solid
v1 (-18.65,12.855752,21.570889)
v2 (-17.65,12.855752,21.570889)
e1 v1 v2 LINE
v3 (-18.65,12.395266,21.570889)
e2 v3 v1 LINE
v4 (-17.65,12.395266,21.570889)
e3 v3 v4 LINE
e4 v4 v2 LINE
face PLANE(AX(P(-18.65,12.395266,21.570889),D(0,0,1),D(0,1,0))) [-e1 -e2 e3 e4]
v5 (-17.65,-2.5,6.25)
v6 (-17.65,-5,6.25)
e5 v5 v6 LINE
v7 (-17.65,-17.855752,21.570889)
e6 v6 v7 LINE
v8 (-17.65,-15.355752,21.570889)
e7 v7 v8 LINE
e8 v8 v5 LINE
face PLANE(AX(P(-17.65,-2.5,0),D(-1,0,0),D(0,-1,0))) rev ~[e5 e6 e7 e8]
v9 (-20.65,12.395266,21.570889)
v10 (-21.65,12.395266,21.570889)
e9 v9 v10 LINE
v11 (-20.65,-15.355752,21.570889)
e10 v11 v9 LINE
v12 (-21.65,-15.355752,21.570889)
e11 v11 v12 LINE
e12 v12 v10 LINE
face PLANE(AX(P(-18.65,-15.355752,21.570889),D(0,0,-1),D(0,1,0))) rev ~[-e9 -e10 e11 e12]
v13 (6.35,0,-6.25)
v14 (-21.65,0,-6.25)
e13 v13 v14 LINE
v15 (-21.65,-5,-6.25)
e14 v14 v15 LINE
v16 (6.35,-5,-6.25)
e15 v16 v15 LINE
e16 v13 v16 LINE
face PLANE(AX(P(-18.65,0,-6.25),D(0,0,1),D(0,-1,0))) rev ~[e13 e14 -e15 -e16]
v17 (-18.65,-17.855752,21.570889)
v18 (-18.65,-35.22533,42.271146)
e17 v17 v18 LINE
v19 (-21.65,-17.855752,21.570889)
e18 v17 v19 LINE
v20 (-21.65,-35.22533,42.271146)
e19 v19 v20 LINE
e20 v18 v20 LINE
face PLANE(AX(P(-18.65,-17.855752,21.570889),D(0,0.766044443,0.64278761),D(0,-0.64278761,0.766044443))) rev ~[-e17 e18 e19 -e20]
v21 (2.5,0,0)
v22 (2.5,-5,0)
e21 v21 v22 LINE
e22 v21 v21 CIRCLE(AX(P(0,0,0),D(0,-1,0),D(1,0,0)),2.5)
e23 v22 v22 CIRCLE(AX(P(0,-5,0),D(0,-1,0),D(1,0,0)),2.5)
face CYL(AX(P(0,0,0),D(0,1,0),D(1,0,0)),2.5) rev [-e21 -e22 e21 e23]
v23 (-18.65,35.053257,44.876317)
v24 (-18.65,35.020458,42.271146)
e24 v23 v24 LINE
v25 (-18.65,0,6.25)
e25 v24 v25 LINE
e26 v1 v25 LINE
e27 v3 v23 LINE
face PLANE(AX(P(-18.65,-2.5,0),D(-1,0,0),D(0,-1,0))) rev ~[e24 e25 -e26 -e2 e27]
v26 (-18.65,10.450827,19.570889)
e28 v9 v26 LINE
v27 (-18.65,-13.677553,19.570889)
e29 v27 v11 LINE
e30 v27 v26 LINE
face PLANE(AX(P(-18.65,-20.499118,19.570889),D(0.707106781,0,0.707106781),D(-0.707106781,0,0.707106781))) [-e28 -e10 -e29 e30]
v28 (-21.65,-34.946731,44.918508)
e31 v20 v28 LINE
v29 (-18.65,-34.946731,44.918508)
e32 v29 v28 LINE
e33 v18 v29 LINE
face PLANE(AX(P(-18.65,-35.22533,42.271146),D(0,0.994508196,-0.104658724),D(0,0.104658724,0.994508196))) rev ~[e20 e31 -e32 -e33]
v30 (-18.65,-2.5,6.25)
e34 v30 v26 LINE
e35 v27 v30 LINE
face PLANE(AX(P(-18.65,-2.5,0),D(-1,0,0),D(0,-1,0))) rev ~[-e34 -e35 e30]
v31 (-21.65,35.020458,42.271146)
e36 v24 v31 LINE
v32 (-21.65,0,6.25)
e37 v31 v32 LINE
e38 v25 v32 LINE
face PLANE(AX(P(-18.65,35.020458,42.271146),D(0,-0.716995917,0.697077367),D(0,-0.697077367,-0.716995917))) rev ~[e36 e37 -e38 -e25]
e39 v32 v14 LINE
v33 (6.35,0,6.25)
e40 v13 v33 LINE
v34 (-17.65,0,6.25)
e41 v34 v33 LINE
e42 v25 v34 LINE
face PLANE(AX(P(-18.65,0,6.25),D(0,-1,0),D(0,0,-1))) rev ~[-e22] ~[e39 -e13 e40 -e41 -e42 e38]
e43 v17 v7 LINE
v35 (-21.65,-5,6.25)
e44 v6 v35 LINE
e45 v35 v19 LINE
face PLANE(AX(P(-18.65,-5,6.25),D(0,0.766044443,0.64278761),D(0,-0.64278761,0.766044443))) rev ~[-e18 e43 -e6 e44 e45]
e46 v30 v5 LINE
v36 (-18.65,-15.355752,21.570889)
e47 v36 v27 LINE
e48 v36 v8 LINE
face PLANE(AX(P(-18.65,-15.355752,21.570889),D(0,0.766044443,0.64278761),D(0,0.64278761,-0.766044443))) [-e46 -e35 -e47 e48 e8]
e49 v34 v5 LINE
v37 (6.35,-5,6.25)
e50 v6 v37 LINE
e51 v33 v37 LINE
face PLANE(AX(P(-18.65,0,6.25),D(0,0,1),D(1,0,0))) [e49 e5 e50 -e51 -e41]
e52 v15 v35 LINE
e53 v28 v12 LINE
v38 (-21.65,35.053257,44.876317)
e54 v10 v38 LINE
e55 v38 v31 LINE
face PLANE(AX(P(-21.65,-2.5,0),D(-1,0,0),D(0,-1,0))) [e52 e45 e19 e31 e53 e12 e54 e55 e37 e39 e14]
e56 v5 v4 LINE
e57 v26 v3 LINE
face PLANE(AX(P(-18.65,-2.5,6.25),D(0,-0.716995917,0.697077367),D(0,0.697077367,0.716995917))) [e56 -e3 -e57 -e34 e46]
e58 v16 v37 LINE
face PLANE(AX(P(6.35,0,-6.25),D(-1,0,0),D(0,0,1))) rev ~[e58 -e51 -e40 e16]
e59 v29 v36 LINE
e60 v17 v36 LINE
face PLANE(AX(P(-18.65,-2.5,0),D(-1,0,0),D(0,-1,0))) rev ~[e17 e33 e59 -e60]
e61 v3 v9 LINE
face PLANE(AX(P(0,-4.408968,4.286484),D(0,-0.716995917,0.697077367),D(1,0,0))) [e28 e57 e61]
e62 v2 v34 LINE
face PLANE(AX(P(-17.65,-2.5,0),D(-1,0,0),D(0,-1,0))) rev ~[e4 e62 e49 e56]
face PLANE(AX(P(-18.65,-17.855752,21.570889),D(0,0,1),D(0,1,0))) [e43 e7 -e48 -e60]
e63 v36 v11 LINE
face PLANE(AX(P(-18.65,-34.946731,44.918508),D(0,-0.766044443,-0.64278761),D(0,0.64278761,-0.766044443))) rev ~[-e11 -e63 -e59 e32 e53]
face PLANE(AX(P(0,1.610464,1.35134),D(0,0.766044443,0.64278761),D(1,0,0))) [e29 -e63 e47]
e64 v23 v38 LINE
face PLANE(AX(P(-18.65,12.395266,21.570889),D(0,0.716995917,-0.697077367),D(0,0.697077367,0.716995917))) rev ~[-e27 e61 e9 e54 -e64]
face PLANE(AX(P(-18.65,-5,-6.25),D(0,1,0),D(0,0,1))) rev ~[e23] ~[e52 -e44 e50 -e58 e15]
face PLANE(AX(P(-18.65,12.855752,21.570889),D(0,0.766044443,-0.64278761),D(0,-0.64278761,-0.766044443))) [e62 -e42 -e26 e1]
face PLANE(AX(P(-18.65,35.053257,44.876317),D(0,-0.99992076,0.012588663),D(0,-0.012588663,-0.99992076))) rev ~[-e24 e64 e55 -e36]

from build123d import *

# Parameters (mm, degrees)
F0_W        = 25
F0_H        = 12.5
F0_R        = 2.5
F1_DEPTH    = 5
F3_DEPTH    = 1
F4_DEPTH    = 3
F5_T4_DEPTH = 38.037750089


# Not quite as in the source:
# - a fillet or chamfer that OpenCascade refuses, or shapes differently, is made with other operations: its cross-section is extruded or revolved along the edge and cut away or added


with BuildPart() as f1:
    # F0 (on Front) → F1 (new body)
    with BuildSketch(Plane.XZ):
        with Locations((-6.15, 0)):
            Rectangle(F0_W, F0_H)
        Circle(F0_R, mode=Mode.SUBTRACT)
    extrude(amount=F1_DEPTH)

    # F2 (on face) → F3 (join)
    with BuildSketch(Plane(origin=(-18.65, 0, 0), x_dir=(0, -1, 0), z_dir=(-1, 0, 0))):
        Polygon((0, 6.25), (0, -6.25), (5, -6.25), (5, 6.25), (2.5, 6.25), align=None)
        Polygon((-12.8557521937, 21.5708888624), (0, 6.25), (2.5, 6.25), (-12.3952659434, 21.5708888624), align=None)
        Polygon((2.5, 6.25), (5, 6.25), (17.8557521937, 21.5708888624), (15.3557521937, 21.5708888624), align=None)
    extrude(amount=-F3_DEPTH)

    # F2 (on face) → F4 (join)
    with BuildSketch(Plane(origin=(-18.65, 0, 0), x_dir=(0, -1, 0), z_dir=(-1, 0, 0))):
        Polygon((0, 6.25), (0, -6.25), (5, -6.25), (5, 6.25), (2.5, 6.25), align=None)
        Polygon((-12.8557521937, 21.5708888624), (0, 6.25), (2.5, 6.25), (-12.3952659434, 21.5708888624), align=None)
        Polygon((-35.0204582804, 42.2711459978), (0, 6.25), (-12.8557521937, 21.5708888624), (-12.3952659434, 21.5708888624), (-35.0532565039, 44.8763173483), align=None)
        Polygon((2.5, 6.25), (5, 6.25), (17.8557521937, 21.5708888624), (15.3557521937, 21.5708888624), align=None)
        Polygon((-12.3952659434, 21.5708888624), (2.5, 6.25), (15.3557521937, 21.5708888624), align=None)
        Polygon((15.3557521937, 21.5708888624), (17.8557521937, 21.5708888624), (35.2253303214, 42.2711459978), (34.9467307814, 44.9185079767), align=None)
    extrude(amount=F4_DEPTH)

    # F5: chamfer of 2 on 1 edges, made by hand


with BuildPart() as f5_tool2:
    # F5_s3 → F5_t4 (new body)
    with BuildSketch(Plane.XZ.offset(20.4991181697)):
        Polygon((-18.65, 19.5708888624), (-20.65, 21.5708888624), (-18.65, 21.5708888624), align=None)
    extrude(amount=-F5_T4_DEPTH)

    split(bisect_by=Plane(origin=(0, -4.4089680227, 4.2864844086), x_dir=(1, 0, 0), z_dir=(0, -0.7169959169, 0.6970773667)), keep=Keep.TOP)

    split(bisect_by=Plane(origin=(0, 1.6104640061, 1.3513397535), x_dir=(1, 0, 0), z_dir=(0, 0.7660444431, 0.6427876097)), keep=Keep.TOP)


with BuildPart() as f1_1:
    add(f1.part)

    # F5_t1: cut F5_tool2
    add(f5_tool2.part, mode=Mode.SUBTRACT)


solid = f1_1.part
